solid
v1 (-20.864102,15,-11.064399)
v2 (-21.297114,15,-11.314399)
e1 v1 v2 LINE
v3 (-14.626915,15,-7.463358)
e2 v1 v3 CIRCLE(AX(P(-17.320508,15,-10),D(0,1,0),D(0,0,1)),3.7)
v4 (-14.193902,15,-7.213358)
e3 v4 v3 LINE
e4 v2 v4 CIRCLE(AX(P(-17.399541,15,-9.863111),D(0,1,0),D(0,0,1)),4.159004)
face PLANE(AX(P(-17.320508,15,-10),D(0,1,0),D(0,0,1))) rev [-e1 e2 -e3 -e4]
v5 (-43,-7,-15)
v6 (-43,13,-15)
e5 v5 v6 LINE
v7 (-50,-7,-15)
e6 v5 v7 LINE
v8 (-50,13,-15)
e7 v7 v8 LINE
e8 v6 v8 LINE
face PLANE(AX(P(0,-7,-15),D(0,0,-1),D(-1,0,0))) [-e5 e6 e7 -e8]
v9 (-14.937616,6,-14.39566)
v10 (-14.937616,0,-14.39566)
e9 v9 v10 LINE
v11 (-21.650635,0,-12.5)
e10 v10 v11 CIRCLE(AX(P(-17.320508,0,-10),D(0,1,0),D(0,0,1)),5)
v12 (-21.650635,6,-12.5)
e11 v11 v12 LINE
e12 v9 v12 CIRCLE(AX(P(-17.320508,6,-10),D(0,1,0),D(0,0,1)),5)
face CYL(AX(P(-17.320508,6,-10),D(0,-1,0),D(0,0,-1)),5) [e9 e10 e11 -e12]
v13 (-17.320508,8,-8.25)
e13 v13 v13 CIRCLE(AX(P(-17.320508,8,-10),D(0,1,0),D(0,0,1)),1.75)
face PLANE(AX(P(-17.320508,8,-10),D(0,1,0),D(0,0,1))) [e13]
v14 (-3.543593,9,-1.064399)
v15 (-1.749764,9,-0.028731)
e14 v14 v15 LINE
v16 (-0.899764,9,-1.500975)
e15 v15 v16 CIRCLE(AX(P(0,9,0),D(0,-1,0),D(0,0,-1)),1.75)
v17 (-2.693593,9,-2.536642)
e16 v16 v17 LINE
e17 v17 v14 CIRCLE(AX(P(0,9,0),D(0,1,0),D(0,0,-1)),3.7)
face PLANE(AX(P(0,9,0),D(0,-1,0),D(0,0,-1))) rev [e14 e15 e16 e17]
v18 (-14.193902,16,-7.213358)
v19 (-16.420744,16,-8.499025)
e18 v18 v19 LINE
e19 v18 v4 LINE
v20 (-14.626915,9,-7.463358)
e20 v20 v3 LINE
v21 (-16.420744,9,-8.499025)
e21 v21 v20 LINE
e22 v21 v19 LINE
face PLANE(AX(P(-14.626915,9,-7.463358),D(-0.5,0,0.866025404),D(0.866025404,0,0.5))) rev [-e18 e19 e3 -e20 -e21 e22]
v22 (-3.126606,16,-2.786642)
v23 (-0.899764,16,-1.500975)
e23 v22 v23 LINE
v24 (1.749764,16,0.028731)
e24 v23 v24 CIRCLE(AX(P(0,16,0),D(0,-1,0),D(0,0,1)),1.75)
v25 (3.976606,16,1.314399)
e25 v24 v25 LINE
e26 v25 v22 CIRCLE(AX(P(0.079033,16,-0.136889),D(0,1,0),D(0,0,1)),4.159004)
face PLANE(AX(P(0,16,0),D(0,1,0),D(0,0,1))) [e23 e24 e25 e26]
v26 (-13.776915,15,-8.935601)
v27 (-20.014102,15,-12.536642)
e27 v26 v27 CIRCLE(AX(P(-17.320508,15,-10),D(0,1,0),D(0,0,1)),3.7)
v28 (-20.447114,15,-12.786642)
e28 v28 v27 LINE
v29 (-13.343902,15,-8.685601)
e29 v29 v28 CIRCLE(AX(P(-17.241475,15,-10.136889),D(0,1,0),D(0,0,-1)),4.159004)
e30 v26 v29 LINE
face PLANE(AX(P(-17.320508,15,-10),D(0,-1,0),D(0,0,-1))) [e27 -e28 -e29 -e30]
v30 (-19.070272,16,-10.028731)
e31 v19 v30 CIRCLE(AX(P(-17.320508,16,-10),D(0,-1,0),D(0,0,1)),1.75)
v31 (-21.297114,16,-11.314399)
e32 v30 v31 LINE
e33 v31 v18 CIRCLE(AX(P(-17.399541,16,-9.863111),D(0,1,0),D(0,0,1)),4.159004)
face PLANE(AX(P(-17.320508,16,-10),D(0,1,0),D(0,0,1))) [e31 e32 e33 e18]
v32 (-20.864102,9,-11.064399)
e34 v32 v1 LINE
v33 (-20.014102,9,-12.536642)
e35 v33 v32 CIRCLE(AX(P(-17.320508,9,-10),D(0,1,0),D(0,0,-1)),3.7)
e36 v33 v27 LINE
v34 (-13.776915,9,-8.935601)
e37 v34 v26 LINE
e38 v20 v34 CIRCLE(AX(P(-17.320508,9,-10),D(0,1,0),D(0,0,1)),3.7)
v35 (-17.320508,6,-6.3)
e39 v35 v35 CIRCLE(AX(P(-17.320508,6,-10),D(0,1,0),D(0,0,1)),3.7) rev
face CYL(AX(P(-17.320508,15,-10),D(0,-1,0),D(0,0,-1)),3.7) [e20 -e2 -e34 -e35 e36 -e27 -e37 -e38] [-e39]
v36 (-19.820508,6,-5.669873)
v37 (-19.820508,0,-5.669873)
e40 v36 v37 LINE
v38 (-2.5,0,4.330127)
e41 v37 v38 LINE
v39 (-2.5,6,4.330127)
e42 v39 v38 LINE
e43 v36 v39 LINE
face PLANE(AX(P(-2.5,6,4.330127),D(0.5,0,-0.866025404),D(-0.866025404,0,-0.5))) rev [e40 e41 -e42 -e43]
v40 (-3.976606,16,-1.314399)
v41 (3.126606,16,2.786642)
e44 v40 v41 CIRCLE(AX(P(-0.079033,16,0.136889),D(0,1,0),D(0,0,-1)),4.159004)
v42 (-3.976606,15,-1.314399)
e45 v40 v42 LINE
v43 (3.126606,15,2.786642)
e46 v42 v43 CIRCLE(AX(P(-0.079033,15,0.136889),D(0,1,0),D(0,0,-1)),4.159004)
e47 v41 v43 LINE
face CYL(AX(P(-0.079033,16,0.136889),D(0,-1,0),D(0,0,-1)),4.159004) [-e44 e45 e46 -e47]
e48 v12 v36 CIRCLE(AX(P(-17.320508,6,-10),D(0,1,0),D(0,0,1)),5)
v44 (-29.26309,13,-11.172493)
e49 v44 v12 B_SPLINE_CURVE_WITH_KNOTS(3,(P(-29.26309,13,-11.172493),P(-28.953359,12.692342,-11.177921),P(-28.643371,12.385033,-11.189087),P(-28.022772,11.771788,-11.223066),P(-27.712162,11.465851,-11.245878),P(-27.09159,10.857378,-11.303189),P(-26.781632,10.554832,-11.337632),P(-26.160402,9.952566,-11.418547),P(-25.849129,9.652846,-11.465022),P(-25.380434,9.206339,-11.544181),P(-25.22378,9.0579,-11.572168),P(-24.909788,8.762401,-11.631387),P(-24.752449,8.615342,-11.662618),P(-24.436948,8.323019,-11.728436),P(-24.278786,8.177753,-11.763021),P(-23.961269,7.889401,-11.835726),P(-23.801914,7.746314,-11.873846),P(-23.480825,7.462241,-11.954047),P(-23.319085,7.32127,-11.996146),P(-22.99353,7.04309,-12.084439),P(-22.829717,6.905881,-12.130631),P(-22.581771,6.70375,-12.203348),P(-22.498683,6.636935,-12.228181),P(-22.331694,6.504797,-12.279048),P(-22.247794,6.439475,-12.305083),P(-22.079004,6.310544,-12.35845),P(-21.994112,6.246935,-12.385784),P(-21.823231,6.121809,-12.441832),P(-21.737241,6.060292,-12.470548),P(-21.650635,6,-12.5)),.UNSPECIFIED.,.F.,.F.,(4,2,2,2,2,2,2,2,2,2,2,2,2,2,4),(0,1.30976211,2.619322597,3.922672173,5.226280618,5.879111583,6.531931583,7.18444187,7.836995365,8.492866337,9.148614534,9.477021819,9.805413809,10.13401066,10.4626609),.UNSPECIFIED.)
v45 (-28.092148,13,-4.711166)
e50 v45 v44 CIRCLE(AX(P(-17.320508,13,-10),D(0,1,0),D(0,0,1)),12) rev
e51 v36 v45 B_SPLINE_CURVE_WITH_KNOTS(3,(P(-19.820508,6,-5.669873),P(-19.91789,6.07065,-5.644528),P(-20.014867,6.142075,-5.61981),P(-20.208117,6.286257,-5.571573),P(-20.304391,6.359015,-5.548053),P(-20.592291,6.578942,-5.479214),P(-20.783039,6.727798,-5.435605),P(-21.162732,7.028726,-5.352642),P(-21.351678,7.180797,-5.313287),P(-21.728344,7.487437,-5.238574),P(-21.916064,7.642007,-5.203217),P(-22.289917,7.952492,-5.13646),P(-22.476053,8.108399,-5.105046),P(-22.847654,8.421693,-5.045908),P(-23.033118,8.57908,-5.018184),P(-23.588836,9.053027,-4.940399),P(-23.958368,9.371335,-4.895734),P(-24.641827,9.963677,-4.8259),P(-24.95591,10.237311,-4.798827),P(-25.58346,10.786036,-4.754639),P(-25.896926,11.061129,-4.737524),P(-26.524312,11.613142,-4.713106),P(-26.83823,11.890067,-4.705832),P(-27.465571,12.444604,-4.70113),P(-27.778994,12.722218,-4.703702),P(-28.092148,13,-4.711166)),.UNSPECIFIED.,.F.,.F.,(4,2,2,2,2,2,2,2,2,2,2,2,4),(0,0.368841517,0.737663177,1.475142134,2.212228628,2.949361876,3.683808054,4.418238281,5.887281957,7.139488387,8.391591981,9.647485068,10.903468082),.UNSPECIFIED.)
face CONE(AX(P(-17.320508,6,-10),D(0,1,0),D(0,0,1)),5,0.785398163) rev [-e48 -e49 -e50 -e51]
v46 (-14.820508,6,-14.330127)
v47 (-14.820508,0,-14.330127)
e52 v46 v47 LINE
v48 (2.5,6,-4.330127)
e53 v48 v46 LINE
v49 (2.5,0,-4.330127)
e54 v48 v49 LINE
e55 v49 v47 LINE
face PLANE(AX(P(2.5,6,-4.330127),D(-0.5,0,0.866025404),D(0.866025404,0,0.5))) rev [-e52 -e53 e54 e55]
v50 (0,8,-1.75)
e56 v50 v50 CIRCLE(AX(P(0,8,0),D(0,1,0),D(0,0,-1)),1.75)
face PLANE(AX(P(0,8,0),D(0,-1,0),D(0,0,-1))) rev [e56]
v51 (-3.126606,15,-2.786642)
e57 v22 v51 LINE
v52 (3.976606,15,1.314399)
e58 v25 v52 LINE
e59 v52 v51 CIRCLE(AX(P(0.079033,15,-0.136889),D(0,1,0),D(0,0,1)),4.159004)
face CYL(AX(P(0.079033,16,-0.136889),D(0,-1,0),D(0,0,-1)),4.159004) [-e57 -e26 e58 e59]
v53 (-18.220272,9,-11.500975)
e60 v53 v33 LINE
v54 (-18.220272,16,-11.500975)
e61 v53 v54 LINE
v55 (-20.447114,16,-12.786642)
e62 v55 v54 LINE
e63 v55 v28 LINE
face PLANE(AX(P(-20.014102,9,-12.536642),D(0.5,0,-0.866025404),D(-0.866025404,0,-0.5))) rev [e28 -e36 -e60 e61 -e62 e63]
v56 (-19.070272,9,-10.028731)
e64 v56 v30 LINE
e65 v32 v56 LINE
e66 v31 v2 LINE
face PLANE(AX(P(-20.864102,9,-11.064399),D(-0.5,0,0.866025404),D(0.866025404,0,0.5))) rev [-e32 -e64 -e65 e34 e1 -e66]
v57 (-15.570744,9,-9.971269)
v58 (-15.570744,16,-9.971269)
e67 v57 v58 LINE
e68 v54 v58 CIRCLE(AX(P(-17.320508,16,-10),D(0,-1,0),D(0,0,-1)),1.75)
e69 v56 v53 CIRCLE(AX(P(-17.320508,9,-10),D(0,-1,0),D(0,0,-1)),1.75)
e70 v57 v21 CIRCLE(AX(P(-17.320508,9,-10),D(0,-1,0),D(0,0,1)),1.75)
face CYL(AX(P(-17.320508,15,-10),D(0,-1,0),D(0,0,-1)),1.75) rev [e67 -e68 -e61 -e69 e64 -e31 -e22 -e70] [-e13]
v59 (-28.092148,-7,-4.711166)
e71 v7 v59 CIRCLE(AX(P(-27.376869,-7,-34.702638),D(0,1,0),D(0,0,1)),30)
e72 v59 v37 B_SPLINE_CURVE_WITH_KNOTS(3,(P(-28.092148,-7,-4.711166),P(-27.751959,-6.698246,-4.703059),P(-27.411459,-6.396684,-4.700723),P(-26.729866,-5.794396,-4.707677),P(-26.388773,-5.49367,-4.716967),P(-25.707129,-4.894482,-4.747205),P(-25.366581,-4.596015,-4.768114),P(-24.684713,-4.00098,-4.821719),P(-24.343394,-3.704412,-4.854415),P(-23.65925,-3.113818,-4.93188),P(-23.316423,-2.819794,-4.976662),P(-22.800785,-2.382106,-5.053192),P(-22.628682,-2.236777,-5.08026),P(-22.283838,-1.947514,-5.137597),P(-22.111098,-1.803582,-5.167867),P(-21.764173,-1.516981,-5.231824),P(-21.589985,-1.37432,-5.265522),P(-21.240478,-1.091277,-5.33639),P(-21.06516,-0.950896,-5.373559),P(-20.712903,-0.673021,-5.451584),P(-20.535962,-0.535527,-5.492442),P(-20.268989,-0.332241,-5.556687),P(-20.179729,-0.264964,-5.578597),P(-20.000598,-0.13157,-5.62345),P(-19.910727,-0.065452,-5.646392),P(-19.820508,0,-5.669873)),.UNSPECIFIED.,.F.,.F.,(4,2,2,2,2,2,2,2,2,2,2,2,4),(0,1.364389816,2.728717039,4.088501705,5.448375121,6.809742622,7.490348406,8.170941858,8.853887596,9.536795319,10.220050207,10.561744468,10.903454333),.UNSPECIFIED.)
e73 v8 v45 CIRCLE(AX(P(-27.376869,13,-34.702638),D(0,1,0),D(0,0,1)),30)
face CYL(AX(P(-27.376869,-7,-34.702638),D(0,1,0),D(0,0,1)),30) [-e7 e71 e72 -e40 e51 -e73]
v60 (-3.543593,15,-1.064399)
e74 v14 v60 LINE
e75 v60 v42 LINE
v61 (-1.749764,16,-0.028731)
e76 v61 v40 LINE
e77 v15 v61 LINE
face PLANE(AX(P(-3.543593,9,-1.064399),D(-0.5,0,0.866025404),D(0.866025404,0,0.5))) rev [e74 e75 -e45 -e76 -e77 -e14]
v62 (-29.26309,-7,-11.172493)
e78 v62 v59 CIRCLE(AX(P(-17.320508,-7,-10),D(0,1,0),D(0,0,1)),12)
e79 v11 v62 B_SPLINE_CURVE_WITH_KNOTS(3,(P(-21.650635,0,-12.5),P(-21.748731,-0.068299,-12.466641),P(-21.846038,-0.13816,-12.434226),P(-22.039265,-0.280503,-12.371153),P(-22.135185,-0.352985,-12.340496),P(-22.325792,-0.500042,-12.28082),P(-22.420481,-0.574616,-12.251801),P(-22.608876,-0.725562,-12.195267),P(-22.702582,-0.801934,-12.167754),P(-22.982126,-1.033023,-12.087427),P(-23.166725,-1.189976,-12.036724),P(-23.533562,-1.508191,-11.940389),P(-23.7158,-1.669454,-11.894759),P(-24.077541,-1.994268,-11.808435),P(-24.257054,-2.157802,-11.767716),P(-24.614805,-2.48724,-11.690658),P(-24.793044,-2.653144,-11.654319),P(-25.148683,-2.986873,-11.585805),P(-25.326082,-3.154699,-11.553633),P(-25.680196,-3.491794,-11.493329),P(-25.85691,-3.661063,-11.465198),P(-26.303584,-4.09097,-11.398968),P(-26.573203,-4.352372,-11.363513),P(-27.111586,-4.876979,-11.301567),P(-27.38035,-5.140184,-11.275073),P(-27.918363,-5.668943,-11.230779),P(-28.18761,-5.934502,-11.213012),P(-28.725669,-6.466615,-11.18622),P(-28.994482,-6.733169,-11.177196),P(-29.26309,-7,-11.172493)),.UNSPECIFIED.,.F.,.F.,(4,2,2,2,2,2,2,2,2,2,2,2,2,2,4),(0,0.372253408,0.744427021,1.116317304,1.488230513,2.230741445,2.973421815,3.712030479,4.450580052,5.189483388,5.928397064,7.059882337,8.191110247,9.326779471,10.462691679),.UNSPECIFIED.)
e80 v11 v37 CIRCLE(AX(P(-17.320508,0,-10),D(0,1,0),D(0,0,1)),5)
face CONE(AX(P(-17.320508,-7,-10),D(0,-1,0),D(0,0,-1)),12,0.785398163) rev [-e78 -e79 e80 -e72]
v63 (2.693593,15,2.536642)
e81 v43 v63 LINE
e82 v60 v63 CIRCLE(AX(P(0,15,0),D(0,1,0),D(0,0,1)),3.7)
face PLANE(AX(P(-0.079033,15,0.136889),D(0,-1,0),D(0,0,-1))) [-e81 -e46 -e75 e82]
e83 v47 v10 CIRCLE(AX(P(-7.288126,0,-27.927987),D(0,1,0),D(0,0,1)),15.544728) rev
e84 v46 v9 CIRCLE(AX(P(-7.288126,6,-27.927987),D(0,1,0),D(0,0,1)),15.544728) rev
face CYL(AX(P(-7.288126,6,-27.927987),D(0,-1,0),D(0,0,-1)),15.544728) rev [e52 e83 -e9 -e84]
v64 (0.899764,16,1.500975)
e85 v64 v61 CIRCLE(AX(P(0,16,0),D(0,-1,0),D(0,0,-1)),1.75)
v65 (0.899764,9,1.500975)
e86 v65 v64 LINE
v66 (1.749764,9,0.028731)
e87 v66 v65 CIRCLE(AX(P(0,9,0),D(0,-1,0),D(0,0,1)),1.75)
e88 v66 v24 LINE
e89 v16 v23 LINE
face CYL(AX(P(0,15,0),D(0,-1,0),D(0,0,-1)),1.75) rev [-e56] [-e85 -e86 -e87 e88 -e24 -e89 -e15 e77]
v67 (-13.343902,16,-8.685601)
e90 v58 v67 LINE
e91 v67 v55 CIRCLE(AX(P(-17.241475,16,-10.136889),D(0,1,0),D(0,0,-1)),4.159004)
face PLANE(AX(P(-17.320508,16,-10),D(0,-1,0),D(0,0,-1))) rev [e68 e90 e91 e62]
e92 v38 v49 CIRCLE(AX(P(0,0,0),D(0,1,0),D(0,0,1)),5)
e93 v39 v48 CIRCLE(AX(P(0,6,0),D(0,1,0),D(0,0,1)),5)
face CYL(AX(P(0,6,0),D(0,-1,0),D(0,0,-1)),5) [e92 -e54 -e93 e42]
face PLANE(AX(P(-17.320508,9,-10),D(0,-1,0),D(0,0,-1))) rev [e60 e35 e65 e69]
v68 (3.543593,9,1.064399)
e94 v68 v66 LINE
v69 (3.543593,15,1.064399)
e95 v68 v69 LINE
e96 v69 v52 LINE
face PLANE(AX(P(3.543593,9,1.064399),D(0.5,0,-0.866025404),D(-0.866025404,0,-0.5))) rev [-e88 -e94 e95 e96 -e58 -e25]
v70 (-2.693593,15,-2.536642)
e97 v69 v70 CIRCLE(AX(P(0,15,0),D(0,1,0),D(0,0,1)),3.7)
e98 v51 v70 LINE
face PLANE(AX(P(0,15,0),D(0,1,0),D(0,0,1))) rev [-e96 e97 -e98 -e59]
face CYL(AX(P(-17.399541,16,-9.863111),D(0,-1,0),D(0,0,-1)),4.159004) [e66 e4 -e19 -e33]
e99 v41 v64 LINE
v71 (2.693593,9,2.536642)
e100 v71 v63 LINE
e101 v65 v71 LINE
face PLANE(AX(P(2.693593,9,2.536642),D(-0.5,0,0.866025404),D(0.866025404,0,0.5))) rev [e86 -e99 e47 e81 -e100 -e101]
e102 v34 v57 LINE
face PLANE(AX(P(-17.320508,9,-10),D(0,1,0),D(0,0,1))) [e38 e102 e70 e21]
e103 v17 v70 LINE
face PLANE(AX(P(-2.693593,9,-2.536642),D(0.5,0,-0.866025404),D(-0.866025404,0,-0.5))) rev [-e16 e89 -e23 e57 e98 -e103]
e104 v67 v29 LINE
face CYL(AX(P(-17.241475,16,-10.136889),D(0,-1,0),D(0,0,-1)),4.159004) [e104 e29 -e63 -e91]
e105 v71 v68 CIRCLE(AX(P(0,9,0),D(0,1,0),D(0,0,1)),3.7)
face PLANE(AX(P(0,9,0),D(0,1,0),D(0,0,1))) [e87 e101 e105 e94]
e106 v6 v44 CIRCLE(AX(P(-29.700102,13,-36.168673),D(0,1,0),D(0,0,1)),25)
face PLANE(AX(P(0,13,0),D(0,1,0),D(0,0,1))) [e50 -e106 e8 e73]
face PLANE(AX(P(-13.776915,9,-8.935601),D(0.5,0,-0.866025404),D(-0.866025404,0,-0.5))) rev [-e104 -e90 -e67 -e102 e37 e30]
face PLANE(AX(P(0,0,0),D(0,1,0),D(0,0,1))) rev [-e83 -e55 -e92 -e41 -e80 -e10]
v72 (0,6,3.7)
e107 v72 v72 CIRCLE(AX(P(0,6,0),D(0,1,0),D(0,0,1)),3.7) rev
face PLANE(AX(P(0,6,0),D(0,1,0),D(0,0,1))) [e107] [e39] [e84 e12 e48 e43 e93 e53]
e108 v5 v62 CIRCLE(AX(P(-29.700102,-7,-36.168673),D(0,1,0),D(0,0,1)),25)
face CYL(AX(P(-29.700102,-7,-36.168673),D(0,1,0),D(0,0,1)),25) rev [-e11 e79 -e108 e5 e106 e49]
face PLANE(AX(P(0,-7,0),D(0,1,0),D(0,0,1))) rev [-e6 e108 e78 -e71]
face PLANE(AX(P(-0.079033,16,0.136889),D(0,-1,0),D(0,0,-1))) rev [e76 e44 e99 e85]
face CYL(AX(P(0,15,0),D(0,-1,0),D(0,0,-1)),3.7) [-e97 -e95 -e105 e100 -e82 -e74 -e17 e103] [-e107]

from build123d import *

# Parameters (mm, degrees)
BOSS_EXTRUDE1_DEPTH      = 6
BOSS_EXTRUDE2_DEPTH      = 13
BOSS_EXTRUDE2_DEPTH_BACK = 7
SKETCH1_5_R              = 3.7
SKETCH1_5_R_2            = 1.75
BOSS_EXTRUDE3_DEPTH      = 15
CHAMFER2_SIZE            = 7
CUT_EXTRUDE1_START       = -6
CUT_EXTRUDE1_DEPTH       = 6
SKETCH4_R                = 1.75
BOSS_EXTRUDE5_DEPTH      = 2
BOSS_EXTRUDE6_DEPTH      = 1


with BuildPart() as part:
    # Sketch1 → Boss-Extrude1 (new body)
    with BuildSketch(Plane(origin=(0, 0, 0), x_dir=(1, 0, 0), z_dir=(0, 1, 0))):
        with BuildLine():
            Line((-19.820508076, 5.669872981), (-2.5, -4.330127019))
            ThreePointArc((-2.5, -4.330127019), (4.330127019, -2.5), (2.5, 4.330127019))
            Line((2.5, 4.330127019), (-14.820508076, 14.330127019))
            ThreePointArc((-14.820508076, 14.330127019), (-14.879132605, 14.36276697), (-14.937615699, 14.395659668))
            ThreePointArc((-14.937615699, 14.395659668), (-21.683794323, 12.441666055), (-19.820508076, 5.669872981))
        make_face()
    extrude(amount=BOSS_EXTRUDE1_DEPTH)

    # Sketch1<4> → Boss-Extrude2 (add, two sides: drawn at the far end of the back side and taken through both)
    with BuildSketch(Plane(origin=(0, 0, 0), x_dir=(1, 0, 0), z_dir=(0, 1, 0)).offset(-BOSS_EXTRUDE2_DEPTH_BACK)):
        with BuildLine():
            ThreePointArc((-50, 15), (-36.237721473, 6.041072894), (-19.820508076, 5.669872981))
            ThreePointArc((-19.820508076, 5.669872981), (-22.150137207, 8.705904774), (-21.650635095, 12.5))
            ThreePointArc((-21.650635095, 12.5), (-32.607722458, 11.338333803), (-43, 15))
            Line((-43, 15), (-50, 15))
        make_face()
    extrude(amount=BOSS_EXTRUDE2_DEPTH + BOSS_EXTRUDE2_DEPTH_BACK)

    # Sketch1<5> → Boss-Extrude3 (add)
    # profile 1 of 5: a face of its own
    with BuildSketch(Plane(origin=(0, 0, 0), x_dir=(1, 0, 0), z_dir=(0, 1, 0))):
        with Locations(Location((0, 0, 0), (0, 0, 270))):
            Circle(SKETCH1_5_R)
        with Locations(Location((0, 0, 0), (0, 0, 270))):
            Circle(SKETCH1_5_R_2, mode=Mode.SUBTRACT)
    # profile 2 of 5: a face of its own
    with BuildSketch(Plane(origin=(0, 0, 0), x_dir=(1, 0, 0), z_dir=(0, 1, 0))):
        with BuildLine():
            ThreePointArc((-15.470508076, 13.204293994), (-20.52480207, 11.85), (-19.170508076, 6.795706006))
            Line((-19.170508076, 6.795706006), (-18.195508076, 8.484455543))
            ThreePointArc((-18.195508076, 8.484455543), (-18.836052532, 10.875), (-16.445508076, 11.515544457))
            Line((-16.445508076, 11.515544457), (-15.470508076, 13.204293994))
        make_face()
    # profile 3 of 5: a face of its own
    with BuildSketch(Plane(origin=(0, 0, 0), x_dir=(1, 0, 0), z_dir=(0, 1, 0))):
        with BuildLine():
            Line((-18.195508076, 8.484455543), (-19.170508076, 6.795706006))
            ThreePointArc((-19.170508076, 6.795706006), (-15.470508076, 6.795706006), (-13.620508076, 10))
            ThreePointArc((-13.620508076, 10), (-14.116214082, 11.85), (-15.470508076, 13.204293994))
            Line((-15.470508076, 13.204293994), (-16.445508076, 11.515544457))
            ThreePointArc((-16.445508076, 11.515544457), (-15.804963619, 10.875), (-15.570508076, 10))
            ThreePointArc((-15.570508076, 10), (-16.445508076, 8.484455543), (-18.195508076, 8.484455543))
        make_face()
    # profile 4 of 5: a face of its own
    with BuildSketch(Plane(origin=(0, 0, 0), x_dir=(1, 0, 0), z_dir=(0, 1, 0))):
        with BuildLine():
            ThreePointArc((-15.470508076, 13.204293994), (-20.52480207, 11.85), (-19.170508076, 6.795706006))
            Line((-19.170508076, 6.795706006), (-18.195508076, 8.484455543))
            ThreePointArc((-18.195508076, 8.484455543), (-18.836052532, 10.875), (-16.445508076, 11.515544457))
            Line((-16.445508076, 11.515544457), (-15.470508076, 13.204293994))
        make_face()
    # profile 5 of 5: a face of its own
    with BuildSketch(Plane(origin=(0, 0, 0), x_dir=(1, 0, 0), z_dir=(0, 1, 0))):
        with BuildLine():
            Line((-18.195508076, 8.484455543), (-19.170508076, 6.795706006))
            ThreePointArc((-19.170508076, 6.795706006), (-15.470508076, 6.795706006), (-13.620508076, 10))
            ThreePointArc((-13.620508076, 10), (-14.116214082, 11.85), (-15.470508076, 13.204293994))
            Line((-15.470508076, 13.204293994), (-16.445508076, 11.515544457))
            ThreePointArc((-16.445508076, 11.515544457), (-15.804963619, 10.875), (-15.570508076, 10))
            ThreePointArc((-15.570508076, 10), (-16.445508076, 8.484455543), (-18.195508076, 8.484455543))
        make_face()
    extrude(amount=BOSS_EXTRUDE3_DEPTH)

    # Chamfer2
    chamfer2_edges = [part.edges().sort_by_distance(p)[0] for p in [
        (-22.150137207, -7, -8.705904774),
        (-22.150137207, 13, -8.705904774),
    ]]
    chamfer(chamfer2_edges, length=CHAMFER2_SIZE - 0.0001)  # a hair under: the kernel refuses the full size

    # Sketch3 → Cut-Extrude1 (cut)
    with BuildSketch(Plane(origin=(0, 15, 0), x_dir=(1, 0, 0), z_dir=(0, 1, 0)).offset(CUT_EXTRUDE1_START)):
        with BuildLine():
            Line((-20.014101509, 12.536642351), (-18.220272206, 11.50097452))
            ThreePointArc((-18.220272206, 11.50097452), (-18.836052532, 10.875), (-19.070272206, 10.028731334))
            Line((-19.070272206, 10.028731334), (-20.864101509, 11.064399165))
            ThreePointArc((-20.864101509, 11.064399165), (-20.52480207, 11.85), (-20.014101509, 12.536642351))
        make_face()
        with BuildLine():
            Line((-13.776914643, 8.935600835), (-15.570743946, 9.971268666))
            ThreePointArc((-15.570743946, 9.971268666), (-15.804963619, 9.125), (-16.420743946, 8.49902548))
            Line((-16.420743946, 8.49902548), (-14.626914643, 7.463357649))
            ThreePointArc((-14.626914643, 7.463357649), (-14.116214082, 8.15), (-13.776914643, 8.935600835))
        make_face()
        with BuildLine():
            Line((2.693593433, -2.536642351), (0.89976413, -1.50097452))
            ThreePointArc((0.89976413, -1.50097452), (1.515544457, -0.875), (1.74976413, -0.028731334))
            Line((1.74976413, -0.028731334), (3.543593433, -1.064399165))
            ThreePointArc((3.543593433, -1.064399165), (3.204293994, -1.85), (2.693593433, -2.536642351))
        make_face()
        with BuildLine():
            Line((-3.543593433, 1.064399165), (-1.74976413, 0.028731334))
            ThreePointArc((-1.74976413, 0.028731334), (-1.515544457, 0.875), (-0.89976413, 1.50097452))
            Line((-0.89976413, 1.50097452), (-2.693593433, 2.536642351))
            ThreePointArc((-2.693593433, 2.536642351), (-3.204293994, 1.85), (-3.543593433, 1.064399165))
        make_face()
    extrude(amount=CUT_EXTRUDE1_DEPTH, mode=Mode.SUBTRACT)

    # Sketch4 → Boss-Extrude5 (add)
    with BuildSketch(Plane(origin=(0, 6, 0), x_dir=(1, 0, 0), z_dir=(0, 1, 0))):
        with Locations(Location((-17.320508076, 10, 0), (0, 0, 120.940718932))):
            Circle(SKETCH4_R)
        with Locations(Location((0, 0, 0), (0, 0, 90))):
            Circle(SKETCH4_R)
    extrude(amount=BOSS_EXTRUDE5_DEPTH)

    # Sketch6 → Boss-Extrude6 (add)
    with BuildSketch(Plane(origin=(0, 15, 0), x_dir=(1, 0, 0), z_dir=(0, 1, 0))):
        with BuildLine():
            Line((-18.220272206, 11.50097452), (-20.447114211, 12.786642351))
            ThreePointArc((-20.447114211, 12.786642351), (-15.161973233, 13.738692017), (-13.343901941, 8.685600835))
            Line((-13.343901941, 8.685600835), (-15.570743946, 9.971268666))
            ThreePointArc((-15.570743946, 9.971268666), (-16.445508076, 11.515544457), (-18.220272206, 11.50097452))
        make_face()
        with BuildLine():
            Line((-16.420743946, 8.49902548), (-14.193901941, 7.213357649))
            ThreePointArc((-14.193901941, 7.213357649), (-19.479042918, 6.261307983), (-21.297114211, 11.314399165))
            Line((-21.297114211, 11.314399165), (-19.070272206, 10.028731334))
            ThreePointArc((-19.070272206, 10.028731334), (-18.195508076, 8.484455543), (-16.420743946, 8.49902548))
        make_face()
        with BuildLine():
            Line((0.89976413, -1.50097452), (3.126606135, -2.786642351))
            ThreePointArc((3.126606135, -2.786642351), (-2.158534843, -3.738692017), (-3.976606135, 1.314399165))
            Line((-3.976606135, 1.314399165), (-1.74976413, 0.028731334))
            ThreePointArc((-1.74976413, 0.028731334), (-0.875, -1.515544457), (0.89976413, -1.50097452))
        make_face()
        with BuildLine():
            Line((-0.89976413, 1.50097452), (-3.126606135, 2.786642351))
            ThreePointArc((-3.126606135, 2.786642351), (2.158534843, 3.738692017), (3.976606135, -1.314399165))
            Line((3.976606135, -1.314399165), (1.74976413, -0.028731334))
            ThreePointArc((1.74976413, -0.028731334), (0.875, 1.515544457), (-0.89976413, 1.50097452))
        make_face()
    extrude(amount=BOSS_EXTRUDE6_DEPTH)


solid = part.part
